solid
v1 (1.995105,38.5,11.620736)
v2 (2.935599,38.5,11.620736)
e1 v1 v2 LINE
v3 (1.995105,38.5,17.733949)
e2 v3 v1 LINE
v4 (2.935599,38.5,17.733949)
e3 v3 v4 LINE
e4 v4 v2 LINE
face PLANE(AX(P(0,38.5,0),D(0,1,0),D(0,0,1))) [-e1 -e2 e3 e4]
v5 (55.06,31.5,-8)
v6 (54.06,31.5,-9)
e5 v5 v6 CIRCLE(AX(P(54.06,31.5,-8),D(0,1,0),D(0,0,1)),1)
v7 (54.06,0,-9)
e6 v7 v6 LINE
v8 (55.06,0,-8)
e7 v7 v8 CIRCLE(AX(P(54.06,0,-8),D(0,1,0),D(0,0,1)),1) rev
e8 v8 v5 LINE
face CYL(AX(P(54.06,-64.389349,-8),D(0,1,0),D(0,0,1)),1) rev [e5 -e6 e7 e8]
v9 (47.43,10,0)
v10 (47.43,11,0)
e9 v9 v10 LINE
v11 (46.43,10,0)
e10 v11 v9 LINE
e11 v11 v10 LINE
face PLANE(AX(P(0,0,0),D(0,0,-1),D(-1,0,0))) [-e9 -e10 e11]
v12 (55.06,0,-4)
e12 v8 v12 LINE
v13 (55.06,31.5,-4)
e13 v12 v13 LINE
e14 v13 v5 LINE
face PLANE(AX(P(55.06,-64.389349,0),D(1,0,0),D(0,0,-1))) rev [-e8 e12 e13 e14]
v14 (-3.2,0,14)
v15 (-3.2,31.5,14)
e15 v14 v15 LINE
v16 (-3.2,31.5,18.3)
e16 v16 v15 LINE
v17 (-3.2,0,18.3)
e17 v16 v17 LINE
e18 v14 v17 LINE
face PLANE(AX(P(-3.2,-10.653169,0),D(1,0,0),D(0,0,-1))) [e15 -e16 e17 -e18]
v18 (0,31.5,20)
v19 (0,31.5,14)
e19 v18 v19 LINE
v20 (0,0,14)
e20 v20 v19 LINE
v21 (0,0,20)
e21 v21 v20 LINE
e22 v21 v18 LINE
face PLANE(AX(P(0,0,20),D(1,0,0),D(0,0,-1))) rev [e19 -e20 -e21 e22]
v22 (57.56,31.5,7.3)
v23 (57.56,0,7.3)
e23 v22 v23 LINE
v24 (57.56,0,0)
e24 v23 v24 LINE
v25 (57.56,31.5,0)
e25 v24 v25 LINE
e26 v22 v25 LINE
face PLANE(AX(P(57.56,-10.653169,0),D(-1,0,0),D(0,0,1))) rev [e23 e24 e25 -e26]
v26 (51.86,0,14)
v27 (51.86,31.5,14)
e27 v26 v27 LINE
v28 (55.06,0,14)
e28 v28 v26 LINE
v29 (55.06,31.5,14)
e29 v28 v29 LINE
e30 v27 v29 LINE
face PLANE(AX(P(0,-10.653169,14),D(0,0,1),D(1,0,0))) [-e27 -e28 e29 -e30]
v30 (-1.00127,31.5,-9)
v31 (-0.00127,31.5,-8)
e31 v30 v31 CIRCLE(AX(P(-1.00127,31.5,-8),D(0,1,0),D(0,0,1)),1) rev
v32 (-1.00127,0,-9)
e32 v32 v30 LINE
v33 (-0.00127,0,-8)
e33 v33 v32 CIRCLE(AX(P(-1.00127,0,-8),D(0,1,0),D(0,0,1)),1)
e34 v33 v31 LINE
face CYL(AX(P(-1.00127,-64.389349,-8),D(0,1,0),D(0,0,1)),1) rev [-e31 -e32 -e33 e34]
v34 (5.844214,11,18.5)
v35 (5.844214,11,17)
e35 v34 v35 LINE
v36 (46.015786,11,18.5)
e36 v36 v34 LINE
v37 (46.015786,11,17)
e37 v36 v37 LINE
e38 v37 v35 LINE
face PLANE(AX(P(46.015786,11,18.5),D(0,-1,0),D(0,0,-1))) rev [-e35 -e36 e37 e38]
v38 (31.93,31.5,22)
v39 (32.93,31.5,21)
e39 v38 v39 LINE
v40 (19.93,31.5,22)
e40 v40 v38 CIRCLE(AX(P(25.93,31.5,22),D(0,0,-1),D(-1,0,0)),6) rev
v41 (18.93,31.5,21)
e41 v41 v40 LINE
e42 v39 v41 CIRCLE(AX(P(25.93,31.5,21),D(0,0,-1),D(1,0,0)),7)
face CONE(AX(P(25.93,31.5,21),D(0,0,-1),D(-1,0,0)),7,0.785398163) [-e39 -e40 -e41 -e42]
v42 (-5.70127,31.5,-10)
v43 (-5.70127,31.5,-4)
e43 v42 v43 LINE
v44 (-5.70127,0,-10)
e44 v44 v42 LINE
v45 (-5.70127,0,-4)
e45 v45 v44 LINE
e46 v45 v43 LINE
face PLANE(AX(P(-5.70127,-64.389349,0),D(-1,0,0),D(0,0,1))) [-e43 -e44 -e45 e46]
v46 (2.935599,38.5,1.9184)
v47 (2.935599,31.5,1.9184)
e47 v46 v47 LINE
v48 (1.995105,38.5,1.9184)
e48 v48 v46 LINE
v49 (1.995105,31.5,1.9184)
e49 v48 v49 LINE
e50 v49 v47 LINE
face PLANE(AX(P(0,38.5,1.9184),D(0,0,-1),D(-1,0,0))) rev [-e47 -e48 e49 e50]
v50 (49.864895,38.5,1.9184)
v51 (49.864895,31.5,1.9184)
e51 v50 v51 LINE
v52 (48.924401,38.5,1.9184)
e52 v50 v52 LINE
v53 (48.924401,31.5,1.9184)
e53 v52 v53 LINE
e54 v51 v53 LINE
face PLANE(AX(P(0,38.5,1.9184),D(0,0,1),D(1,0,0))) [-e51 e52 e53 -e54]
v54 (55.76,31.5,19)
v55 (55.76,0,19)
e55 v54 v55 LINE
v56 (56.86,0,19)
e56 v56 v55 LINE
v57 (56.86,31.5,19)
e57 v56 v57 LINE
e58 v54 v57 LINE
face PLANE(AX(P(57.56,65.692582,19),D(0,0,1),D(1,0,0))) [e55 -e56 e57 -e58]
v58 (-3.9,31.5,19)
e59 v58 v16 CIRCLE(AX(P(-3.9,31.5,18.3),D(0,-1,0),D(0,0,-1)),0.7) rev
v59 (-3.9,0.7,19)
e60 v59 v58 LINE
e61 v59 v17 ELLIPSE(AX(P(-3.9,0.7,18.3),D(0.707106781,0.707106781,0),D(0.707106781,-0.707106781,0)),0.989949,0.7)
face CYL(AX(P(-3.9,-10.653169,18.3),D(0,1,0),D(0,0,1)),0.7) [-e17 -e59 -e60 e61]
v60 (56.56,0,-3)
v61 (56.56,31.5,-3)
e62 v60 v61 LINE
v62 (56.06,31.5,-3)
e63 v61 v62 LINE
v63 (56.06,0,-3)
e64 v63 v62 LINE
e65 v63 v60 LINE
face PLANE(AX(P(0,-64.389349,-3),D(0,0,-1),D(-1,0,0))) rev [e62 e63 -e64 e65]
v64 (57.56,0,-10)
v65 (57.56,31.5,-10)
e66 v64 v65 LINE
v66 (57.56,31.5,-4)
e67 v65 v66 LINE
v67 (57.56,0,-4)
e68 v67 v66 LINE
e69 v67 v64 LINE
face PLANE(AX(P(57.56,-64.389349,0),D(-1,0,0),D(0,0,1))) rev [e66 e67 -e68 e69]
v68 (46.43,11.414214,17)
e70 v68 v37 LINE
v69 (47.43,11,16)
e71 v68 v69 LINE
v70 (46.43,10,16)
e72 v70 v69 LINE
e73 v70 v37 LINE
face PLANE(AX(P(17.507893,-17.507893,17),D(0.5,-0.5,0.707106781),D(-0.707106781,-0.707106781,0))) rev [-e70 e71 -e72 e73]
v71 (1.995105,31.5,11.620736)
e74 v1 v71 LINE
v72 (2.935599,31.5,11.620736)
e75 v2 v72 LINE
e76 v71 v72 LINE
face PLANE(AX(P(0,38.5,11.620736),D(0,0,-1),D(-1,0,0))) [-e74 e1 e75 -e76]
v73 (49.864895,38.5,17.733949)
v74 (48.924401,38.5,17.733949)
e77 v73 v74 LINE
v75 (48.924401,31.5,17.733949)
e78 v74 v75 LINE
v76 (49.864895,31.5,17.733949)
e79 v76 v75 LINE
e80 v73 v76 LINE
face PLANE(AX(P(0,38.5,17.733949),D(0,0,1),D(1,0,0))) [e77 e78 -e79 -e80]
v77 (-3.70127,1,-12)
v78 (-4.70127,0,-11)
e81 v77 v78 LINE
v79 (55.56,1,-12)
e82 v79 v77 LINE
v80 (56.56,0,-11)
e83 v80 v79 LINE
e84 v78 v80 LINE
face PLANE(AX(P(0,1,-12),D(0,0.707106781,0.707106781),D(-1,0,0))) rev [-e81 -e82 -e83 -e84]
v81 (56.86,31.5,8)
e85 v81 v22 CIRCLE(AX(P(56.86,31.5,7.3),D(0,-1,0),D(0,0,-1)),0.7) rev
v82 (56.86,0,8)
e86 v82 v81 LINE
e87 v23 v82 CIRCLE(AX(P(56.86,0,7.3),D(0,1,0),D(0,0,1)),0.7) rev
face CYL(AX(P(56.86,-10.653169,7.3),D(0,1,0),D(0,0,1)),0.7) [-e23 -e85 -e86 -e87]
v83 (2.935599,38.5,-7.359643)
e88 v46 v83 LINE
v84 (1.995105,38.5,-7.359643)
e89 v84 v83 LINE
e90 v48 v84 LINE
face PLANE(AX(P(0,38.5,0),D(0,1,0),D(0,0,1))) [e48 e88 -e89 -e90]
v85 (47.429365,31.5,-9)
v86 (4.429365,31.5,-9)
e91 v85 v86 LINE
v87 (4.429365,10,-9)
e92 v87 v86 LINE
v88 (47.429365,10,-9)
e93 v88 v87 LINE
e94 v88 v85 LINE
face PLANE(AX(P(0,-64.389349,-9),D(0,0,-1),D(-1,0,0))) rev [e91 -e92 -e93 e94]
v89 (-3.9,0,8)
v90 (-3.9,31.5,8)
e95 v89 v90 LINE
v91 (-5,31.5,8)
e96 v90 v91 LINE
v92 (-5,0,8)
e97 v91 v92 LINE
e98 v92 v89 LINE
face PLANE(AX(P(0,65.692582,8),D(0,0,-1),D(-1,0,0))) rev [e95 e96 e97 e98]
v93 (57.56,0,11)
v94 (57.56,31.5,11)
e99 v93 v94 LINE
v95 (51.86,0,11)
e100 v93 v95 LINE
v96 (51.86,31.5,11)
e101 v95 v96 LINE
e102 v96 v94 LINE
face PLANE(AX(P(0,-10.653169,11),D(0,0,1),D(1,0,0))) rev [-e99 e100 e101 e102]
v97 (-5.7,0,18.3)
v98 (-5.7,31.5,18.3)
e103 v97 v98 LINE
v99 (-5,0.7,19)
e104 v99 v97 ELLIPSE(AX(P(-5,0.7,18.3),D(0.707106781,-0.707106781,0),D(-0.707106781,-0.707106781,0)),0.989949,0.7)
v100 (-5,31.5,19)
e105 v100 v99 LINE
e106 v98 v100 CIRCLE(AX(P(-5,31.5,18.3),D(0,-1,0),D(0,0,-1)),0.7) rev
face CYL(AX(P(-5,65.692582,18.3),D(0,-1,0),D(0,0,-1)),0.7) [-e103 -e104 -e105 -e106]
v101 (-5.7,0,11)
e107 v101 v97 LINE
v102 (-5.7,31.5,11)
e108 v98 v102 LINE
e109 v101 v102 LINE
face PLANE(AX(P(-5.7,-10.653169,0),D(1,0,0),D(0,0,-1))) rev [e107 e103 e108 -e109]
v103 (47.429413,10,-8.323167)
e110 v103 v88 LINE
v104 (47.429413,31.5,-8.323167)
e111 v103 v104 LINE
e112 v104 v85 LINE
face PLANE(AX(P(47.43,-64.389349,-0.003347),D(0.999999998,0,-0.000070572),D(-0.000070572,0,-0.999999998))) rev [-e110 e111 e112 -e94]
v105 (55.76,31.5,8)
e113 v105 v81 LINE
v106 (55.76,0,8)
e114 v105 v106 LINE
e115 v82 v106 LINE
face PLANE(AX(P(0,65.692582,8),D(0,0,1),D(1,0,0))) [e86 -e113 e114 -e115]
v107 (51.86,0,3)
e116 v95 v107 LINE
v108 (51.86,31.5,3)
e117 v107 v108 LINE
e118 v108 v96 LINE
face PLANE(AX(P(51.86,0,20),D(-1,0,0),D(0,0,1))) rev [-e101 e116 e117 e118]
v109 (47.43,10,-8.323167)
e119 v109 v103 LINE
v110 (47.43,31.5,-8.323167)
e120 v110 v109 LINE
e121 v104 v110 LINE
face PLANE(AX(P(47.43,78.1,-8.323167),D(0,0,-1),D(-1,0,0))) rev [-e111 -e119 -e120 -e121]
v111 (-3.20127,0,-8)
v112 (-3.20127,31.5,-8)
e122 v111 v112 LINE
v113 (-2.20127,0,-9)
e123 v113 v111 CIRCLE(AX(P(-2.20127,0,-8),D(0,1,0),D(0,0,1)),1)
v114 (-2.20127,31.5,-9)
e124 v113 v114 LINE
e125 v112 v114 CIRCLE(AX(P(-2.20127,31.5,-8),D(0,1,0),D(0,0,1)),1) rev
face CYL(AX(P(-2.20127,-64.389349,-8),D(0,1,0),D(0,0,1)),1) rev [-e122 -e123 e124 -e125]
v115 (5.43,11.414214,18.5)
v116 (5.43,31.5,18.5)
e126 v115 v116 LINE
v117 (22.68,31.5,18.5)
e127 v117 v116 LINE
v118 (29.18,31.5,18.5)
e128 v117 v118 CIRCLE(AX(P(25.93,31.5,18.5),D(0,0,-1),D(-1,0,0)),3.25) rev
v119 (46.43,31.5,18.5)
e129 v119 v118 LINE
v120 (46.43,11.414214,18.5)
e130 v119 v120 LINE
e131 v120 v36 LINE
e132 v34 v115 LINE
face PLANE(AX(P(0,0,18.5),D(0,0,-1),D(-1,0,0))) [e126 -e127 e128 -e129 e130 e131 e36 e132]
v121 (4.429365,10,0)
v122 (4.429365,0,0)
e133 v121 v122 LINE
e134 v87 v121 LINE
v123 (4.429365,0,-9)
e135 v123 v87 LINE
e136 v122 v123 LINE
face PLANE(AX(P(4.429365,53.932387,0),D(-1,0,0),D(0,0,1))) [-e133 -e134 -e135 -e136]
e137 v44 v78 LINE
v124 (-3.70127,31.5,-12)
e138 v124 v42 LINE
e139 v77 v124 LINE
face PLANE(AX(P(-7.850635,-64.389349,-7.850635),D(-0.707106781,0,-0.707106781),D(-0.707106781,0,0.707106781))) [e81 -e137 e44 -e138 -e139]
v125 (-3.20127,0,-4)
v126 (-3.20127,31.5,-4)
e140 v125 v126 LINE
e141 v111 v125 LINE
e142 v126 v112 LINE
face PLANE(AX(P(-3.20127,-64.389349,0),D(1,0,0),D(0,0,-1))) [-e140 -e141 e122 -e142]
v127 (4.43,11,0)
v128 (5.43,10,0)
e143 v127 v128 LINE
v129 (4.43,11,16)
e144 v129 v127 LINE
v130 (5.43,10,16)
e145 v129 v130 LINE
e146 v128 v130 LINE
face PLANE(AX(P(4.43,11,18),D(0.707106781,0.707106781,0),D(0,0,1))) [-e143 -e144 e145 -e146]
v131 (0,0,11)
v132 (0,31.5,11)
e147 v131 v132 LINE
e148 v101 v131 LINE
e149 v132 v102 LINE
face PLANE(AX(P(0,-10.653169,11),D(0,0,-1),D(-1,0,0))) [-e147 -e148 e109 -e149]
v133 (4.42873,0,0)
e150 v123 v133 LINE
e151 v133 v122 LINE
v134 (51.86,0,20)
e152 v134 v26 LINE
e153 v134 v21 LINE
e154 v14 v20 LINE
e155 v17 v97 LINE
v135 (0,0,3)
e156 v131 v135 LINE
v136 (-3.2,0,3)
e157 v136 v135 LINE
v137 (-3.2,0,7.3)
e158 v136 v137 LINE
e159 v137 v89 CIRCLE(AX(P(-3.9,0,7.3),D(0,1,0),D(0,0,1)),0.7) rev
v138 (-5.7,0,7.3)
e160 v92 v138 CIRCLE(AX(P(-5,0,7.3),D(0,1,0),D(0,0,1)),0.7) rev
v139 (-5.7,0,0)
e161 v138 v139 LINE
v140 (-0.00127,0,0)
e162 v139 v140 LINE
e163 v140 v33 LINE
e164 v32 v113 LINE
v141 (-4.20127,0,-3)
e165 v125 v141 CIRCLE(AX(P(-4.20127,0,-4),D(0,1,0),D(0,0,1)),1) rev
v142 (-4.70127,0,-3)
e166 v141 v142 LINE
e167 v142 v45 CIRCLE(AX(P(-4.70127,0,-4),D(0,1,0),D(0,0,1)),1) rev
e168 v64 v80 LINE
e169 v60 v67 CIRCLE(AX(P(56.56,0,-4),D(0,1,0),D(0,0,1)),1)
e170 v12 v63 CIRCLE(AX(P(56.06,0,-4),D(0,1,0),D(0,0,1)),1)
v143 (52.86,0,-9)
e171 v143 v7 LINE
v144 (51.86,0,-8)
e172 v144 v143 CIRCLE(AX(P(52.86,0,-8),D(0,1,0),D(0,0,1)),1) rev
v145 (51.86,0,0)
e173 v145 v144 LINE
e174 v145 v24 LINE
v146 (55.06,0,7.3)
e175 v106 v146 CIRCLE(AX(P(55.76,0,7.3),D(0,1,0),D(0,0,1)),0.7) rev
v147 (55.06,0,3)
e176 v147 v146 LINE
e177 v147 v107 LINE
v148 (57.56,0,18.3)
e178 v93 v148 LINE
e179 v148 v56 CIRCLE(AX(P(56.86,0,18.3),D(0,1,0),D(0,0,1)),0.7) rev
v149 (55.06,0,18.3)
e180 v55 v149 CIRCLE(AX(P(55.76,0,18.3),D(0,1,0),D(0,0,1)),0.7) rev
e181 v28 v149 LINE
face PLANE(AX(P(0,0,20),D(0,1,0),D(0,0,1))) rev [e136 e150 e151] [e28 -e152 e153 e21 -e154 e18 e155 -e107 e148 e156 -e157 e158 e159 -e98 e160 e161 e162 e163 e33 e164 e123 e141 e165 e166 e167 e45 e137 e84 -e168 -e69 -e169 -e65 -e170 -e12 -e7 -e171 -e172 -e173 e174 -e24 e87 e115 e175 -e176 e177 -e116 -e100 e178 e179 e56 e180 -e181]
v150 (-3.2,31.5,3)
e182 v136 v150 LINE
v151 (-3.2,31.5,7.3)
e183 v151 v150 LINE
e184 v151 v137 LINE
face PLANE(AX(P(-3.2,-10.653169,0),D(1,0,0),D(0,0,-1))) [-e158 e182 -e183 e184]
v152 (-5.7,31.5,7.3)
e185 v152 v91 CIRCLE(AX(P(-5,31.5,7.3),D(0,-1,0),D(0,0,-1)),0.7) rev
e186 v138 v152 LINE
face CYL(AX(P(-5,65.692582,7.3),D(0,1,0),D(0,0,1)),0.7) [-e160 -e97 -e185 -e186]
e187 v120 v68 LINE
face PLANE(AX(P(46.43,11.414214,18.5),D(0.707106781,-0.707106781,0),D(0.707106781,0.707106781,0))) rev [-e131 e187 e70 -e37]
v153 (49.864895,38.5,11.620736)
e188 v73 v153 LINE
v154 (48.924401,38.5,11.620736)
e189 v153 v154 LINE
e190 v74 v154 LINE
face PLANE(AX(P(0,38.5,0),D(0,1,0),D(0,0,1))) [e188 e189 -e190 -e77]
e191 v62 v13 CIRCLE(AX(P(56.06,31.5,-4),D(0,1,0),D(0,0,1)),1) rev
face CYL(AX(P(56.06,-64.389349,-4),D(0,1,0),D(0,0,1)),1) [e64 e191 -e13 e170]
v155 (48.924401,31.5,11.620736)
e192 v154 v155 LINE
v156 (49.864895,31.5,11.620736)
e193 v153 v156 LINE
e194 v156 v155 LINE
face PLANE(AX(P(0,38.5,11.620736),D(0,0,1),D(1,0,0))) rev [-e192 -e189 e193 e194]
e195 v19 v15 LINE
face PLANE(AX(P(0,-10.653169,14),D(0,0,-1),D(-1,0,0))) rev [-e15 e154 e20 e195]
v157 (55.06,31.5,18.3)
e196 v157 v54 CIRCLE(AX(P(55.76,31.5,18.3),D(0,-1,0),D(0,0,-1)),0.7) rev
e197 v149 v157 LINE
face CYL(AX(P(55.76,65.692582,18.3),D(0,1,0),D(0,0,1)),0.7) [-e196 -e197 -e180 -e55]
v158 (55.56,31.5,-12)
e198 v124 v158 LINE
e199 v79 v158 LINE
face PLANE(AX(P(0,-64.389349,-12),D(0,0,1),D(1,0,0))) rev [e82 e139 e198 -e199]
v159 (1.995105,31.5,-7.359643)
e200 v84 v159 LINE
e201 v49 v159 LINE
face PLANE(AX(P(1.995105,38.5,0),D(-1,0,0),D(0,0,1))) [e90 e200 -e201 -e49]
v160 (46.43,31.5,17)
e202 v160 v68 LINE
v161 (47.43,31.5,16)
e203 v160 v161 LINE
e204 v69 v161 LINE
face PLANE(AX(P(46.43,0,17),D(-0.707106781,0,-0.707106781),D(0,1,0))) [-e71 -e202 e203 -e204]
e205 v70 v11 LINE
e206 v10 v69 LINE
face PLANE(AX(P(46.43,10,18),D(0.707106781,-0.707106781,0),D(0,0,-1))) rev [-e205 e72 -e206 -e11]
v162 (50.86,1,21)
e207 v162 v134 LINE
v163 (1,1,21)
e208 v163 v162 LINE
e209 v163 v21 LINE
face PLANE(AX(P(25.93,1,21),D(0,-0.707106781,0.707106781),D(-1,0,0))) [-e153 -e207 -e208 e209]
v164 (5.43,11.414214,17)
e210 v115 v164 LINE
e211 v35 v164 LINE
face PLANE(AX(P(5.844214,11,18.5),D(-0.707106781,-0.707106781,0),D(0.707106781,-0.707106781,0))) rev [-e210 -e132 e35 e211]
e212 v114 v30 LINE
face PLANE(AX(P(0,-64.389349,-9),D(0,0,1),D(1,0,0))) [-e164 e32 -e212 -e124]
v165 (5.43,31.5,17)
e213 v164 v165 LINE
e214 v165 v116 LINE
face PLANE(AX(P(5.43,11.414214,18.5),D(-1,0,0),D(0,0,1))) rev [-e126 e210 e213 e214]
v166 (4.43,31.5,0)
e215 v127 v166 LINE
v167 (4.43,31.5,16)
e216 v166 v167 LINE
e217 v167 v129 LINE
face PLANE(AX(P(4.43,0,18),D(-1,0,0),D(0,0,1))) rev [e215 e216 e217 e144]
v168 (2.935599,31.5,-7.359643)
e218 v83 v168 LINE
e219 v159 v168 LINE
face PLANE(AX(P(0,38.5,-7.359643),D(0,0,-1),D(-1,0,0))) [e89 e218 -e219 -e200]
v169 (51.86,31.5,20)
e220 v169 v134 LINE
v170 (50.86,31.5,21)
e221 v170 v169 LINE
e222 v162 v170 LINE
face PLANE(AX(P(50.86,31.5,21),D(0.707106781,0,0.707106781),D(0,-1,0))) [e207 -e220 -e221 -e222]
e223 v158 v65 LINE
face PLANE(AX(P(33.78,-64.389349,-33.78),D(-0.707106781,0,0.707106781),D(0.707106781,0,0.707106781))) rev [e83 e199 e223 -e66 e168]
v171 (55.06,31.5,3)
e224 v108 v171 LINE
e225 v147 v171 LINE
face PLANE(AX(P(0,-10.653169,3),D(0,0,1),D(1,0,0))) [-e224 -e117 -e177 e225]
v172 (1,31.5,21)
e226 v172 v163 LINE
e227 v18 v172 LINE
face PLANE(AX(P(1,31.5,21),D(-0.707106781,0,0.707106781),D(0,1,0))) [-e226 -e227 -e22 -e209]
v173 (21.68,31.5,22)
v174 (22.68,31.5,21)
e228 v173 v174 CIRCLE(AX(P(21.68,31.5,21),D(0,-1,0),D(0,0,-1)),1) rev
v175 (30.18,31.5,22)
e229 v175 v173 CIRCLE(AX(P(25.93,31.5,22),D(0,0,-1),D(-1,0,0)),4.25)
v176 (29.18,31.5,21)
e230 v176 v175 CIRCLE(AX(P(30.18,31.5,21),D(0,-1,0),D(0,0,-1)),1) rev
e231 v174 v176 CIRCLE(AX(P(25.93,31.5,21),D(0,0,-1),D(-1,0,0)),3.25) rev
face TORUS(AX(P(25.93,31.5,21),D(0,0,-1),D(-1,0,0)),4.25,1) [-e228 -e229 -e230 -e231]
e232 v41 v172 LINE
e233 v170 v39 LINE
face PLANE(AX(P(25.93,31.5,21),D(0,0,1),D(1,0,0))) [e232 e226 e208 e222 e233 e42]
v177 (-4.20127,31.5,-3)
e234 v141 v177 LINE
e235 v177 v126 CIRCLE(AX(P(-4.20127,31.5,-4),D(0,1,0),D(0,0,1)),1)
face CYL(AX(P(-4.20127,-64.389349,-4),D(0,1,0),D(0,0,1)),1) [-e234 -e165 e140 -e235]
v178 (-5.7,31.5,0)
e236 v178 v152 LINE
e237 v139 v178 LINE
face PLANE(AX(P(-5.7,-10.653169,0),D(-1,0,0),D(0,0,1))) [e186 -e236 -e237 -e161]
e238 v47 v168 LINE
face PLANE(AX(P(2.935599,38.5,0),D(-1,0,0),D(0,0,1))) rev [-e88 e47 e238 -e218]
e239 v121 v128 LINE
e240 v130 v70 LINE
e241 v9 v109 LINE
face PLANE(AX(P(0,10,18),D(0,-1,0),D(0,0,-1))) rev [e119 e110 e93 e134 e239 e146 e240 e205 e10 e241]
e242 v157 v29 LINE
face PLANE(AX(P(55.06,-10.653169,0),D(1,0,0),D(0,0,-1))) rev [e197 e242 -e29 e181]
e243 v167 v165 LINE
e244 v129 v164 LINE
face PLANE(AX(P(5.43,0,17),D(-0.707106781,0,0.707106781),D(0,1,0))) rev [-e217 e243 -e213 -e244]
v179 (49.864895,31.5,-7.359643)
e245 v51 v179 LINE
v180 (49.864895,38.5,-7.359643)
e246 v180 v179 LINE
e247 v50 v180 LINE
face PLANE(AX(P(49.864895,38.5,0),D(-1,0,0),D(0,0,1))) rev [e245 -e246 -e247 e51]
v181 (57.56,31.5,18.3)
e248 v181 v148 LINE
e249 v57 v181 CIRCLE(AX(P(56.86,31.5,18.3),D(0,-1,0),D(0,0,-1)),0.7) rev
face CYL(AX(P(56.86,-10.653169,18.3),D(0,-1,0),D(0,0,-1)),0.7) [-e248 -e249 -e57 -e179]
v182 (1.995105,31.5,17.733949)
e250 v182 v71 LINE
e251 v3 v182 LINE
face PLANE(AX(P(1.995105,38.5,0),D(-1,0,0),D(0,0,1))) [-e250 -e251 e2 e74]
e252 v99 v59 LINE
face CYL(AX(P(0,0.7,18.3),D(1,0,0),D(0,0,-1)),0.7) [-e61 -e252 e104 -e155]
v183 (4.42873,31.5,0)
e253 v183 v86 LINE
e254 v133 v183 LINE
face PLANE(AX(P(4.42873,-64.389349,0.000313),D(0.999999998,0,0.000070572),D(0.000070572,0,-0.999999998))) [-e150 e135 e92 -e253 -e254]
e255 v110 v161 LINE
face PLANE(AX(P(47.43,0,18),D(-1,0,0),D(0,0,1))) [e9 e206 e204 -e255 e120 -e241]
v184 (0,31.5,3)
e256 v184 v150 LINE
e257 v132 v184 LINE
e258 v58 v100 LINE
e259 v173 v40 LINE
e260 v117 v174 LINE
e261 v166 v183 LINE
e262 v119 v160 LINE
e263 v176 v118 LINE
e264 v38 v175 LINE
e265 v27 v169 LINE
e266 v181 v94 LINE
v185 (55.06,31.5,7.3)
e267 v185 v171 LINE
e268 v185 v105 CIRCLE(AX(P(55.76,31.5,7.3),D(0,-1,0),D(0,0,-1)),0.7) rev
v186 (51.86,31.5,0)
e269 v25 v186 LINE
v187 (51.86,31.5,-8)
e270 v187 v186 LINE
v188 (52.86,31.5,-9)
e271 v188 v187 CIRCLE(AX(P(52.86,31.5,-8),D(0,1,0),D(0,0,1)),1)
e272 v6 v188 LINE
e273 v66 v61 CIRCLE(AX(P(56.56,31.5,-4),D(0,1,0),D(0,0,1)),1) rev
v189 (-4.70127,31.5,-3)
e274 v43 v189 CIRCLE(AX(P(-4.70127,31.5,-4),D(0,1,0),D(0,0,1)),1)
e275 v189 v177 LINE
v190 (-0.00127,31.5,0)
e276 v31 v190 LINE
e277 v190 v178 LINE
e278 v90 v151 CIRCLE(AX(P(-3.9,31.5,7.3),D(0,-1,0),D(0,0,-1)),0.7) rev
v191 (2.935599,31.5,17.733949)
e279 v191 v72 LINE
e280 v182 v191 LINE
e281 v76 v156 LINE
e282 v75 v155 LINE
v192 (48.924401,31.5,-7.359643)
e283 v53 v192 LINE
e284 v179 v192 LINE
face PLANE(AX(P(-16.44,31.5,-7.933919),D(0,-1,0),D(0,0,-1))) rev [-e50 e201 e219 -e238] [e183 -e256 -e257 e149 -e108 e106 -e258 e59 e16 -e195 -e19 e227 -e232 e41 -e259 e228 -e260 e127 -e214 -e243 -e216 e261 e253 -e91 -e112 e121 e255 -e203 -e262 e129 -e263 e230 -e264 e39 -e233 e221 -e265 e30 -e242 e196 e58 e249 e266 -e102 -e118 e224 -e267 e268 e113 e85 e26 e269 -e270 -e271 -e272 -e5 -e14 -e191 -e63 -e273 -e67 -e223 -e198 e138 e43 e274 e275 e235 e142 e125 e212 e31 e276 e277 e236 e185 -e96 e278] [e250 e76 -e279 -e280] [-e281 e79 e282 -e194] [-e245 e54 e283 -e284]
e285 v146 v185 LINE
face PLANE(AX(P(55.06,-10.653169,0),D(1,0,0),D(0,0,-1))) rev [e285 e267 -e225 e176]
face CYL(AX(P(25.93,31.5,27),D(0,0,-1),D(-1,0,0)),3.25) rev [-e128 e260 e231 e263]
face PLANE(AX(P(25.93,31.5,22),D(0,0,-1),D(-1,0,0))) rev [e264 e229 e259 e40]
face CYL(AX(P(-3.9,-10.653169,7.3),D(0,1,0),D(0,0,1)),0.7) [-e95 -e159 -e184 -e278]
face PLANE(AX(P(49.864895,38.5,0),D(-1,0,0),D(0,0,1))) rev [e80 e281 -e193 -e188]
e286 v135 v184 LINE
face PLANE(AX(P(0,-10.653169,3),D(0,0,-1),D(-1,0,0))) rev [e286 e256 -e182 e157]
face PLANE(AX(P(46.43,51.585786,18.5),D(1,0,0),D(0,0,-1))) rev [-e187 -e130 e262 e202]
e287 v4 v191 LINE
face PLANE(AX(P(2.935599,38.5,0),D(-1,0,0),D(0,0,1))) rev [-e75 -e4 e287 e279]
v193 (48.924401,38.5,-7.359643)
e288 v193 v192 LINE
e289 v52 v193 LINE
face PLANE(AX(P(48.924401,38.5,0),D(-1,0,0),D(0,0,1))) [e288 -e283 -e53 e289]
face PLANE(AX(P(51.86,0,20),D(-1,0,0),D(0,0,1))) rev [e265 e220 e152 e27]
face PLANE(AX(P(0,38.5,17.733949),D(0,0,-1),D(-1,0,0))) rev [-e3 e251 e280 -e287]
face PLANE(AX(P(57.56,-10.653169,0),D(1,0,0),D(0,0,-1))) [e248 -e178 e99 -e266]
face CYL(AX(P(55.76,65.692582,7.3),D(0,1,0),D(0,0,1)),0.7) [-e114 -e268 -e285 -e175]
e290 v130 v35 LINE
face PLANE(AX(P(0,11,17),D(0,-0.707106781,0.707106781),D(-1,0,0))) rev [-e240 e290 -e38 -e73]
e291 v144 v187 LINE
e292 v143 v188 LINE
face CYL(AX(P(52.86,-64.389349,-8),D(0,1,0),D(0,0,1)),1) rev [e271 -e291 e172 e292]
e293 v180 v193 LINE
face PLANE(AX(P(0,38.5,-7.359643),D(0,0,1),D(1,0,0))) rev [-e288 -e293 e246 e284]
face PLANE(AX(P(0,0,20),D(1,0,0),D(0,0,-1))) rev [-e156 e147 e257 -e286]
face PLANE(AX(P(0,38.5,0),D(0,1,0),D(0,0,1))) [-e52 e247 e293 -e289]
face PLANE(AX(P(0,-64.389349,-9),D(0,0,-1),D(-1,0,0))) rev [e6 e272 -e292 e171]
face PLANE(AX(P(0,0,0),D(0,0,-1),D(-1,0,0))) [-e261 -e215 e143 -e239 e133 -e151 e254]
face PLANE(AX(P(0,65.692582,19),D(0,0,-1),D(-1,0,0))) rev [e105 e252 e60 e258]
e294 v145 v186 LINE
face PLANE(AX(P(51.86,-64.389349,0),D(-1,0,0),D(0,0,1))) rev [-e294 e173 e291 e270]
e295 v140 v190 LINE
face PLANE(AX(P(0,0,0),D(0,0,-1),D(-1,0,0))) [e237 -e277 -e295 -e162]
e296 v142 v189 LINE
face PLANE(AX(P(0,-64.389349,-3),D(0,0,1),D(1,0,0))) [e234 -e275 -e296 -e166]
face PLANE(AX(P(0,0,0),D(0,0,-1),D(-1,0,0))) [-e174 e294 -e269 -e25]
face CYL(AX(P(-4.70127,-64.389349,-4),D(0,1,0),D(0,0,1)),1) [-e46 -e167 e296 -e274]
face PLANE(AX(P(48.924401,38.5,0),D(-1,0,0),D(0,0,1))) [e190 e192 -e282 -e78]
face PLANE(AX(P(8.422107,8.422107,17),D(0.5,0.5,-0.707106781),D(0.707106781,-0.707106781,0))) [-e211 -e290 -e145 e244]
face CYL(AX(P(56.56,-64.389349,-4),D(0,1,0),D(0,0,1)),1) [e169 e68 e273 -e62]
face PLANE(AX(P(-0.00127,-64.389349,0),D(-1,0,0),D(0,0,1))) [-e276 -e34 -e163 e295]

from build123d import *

# Parameters (mm, degrees)
ESQUISSE1_W              = 51.86
ESQUISSE1_H              = 63
BOSS_EXTRU_1_DEPTH       = 20
ENL_V_MAT_EXTRU_1_DEPTH  = 18
ESQUISSE3_W              = 8.7
ESQUISSE3_H              = 3
BOSS_EXTRU_2_DEPTH       = 7
ESQUISSE4_W              = 43
ESQUISSE4_H              = 43
BOSS_EXTRU_3_DEPTH       = 1
CHANFREIN1_SIZE          = 1
ESQUISSE6_R              = 7
BOSS_EXTRU_4_DEPTH       = 5
ENL_V_MAT_EXTRU_2_DEPTH  = 10
BOSS_EXTRU_5_DEPTH       = 63
ESQUISSE9_W              = 2.5
ESQUISSE9_H              = 1
ENL_V_MAT_EXTRU_3_DEPTH  = 63
CHANFREIN3_SIZE          = 1
CONG_1_R                 = 1
CONG_2_R                 = 1
CONG_5_R                 = 0.7
ENL_V_MAT_EXTRU_11_DEPTH = 1.5
ESQUISSE24_W             = 38.565319184
ESQUISSE24_H             = 34.907409987
ENL_V_MAT_EXTRU_16_DEPTH = 74
BOSS_EXTRU_11_REACH      = 71.206
ESQUISSE26_W             = 43.000682915
ESQUISSE26_H             = 8.323167201
ENL_V_MAT_EXTRU_17_DEPTH = 74
ESQUISSE27_W             = 43.00063515
ESQUISSE27_H             = 9
BOSS_EXTRU_12_DEPTH      = 10
BOSS_EXTRU_13_DEPTH      = 1
CHANFREIN4_SIZE          = 1
CHANFREIN5_SIZE          = 1
ESQUISSE29_W             = 0.940494366
ESQUISSE29_H             = 6.11321338
ESQUISSE29_H_2           = 9.278042655
BOSS_EXTRU_14_DEPTH      = 7


with BuildPart() as part:
    # Esquisse1 → Boss.-Extru.1 (new body)
    with BuildSketch(Plane.XY):
        with Locations((25.93, 31.5)):
            Rectangle(ESQUISSE1_W, ESQUISSE1_H)
    extrude(amount=BOSS_EXTRU_1_DEPTH)

    # Esquisse2 → Enlèv. mat.-Extru.1 (cut)
    with BuildSketch(Plane(origin=(0, 0, 0), x_dir=(-1, 0, 0), z_dir=(0, 0, -1))):
        Polygon((-8.231746032, 10), (-43.628253968, 53), (-47.43, 53), (-47.43, 10), align=None)
        Polygon((-4.43, 53), (-43.628253968, 53), (-8.231746032, 10), (-4.43, 10), align=None)
    extrude(amount=-ENL_V_MAT_EXTRU_1_DEPTH, mode=Mode.SUBTRACT)

    # Esquisse3 → Boss.-Extru.2 (add)
    with BuildSketch(Plane(origin=(0, 0, 0), x_dir=(-1, 0, 0), z_dir=(0, 0, -1))):
        with Locations((-8.88, 57.4)):
            Rectangle(ESQUISSE3_W, ESQUISSE3_H)
        with Locations((-42.98, 57.4)):
            Rectangle(ESQUISSE3_W, ESQUISSE3_H)
        with Locations((-42.98, 5.6)):
            Rectangle(ESQUISSE3_W, ESQUISSE3_H)
        with Locations((-8.88, 5.6)):
            Rectangle(ESQUISSE3_W, ESQUISSE3_H)
    extrude(amount=BOSS_EXTRU_2_DEPTH)

    # Esquisse4 → Boss.-Extru.3 (add)
    with BuildSketch(Plane(origin=(0, 0, 18), x_dir=(-1, 0, 0), z_dir=(0, 0, -1))):
        with Locations((-25.93, 31.5)):
            Rectangle(ESQUISSE4_W, ESQUISSE4_H)
    extrude(amount=BOSS_EXTRU_3_DEPTH)

    # Chanfrein1
    chanfrein1_edges = [part.edges().sort_by_distance(p)[0] for p in [
        (47.43, 10, 8.5),
        (47.43, 53, 8.5),
        (4.43, 10, 8.5),
        (4.43, 53, 8.5),
    ]]
    chamfer(chanfrein1_edges, length=CHANFREIN1_SIZE)

    # Esquisse6 → Boss.-Extru.4 (add)
    with BuildSketch(Plane(origin=(0, 0, 17), x_dir=(-1, 0, 0), z_dir=(0, 0, -1))):
        with Locations((-25.93, 31.5)):
            Circle(ESQUISSE6_R)
    extrude(amount=-BOSS_EXTRU_4_DEPTH)

    # Esquisse7 → Enlèv. mat.-Extru.2 (cut)
    with BuildSketch(Plane(origin=(0, 0, 17), x_dir=(-1, 0, 0), z_dir=(0, 0, -1))):
        with BuildLine():
            ThreePointArc((-22.68, 31.5), (-23.631902961, 33.798097039), (-25.93, 34.75))
            Line((-25.93, 34.75), (-25.93, 28.25))
            ThreePointArc((-25.93, 28.25), (-23.631902961, 29.201902961), (-22.68, 31.5))
        make_face()
        with BuildLine():
            Line((-25.93, 28.25), (-25.93, 34.75))
            ThreePointArc((-25.93, 34.75), (-29.18, 31.5), (-25.93, 28.25))
        make_face()
    extrude(amount=-ENL_V_MAT_EXTRU_2_DEPTH, mode=Mode.SUBTRACT)

    # Esquisse8 → Boss.-Extru.5 (add)
    with BuildSketch(Plane(origin=(0, 63, 0), x_dir=(1, 0, 0), z_dir=(0, 1, 0))):
        Polygon((55.06, -3), (55.06, -9), (57.56, -9), (57.56, 0), (51.86, 0), (51.86, -3), align=None)
        Polygon((57.56, -11), (51.86, -11), (51.86, -14), (55.06, -14), (55.06, -20), (57.56, -20), align=None)
        Polygon((0, -3), (0, 0), (-5.7, 0), (-5.7, -9), (-3.2, -9), (-3.2, -3), align=None)
        Polygon((0, -14), (0, -11), (-5.7, -11), (-5.7, -20), (-3.2, -20), (-3.2, -14), align=None)
    extrude(amount=-BOSS_EXTRU_5_DEPTH)

    # Esquisse9 → Enlèv. mat.-Extru.3 (cut)
    with BuildSketch(Plane.XZ):
        with Locations((-4.45, 8.5)):
            Rectangle(ESQUISSE9_W, ESQUISSE9_H)
        with Locations((-4.45, 19.5)):
            Rectangle(ESQUISSE9_W, ESQUISSE9_H)
        with Locations((56.31, 8.5)):
            Rectangle(ESQUISSE9_W, ESQUISSE9_H)
        with Locations((56.31, 19.5)):
            Rectangle(ESQUISSE9_W, ESQUISSE9_H)
    extrude(amount=-ENL_V_MAT_EXTRU_3_DEPTH, mode=Mode.SUBTRACT)

    # Chanfrein3
    chanfrein3_edges = [part.edges().sort_by_distance(p)[0] for p in [
        (46.93, 52.5, 17),
        (4.93, 52.5, 17),
        (46.93, 10.5, 17),
        (4.93, 10.5, 17),
        (25.93, 34.75, 17),
        (4.43, 31.5, 17),
        (25.93, 10, 17),
        (47.43, 31.5, 17),
        (25.93, 53, 17),
    ]]
    chamfer(chanfrein3_edges, length=CHANFREIN3_SIZE)

    # Congé1
    cong_1_edges = [part.edges().sort_by_distance(p)[0] for p in [
        (4.53, 57.4, -7),
        (8.88, 55.9, -7),
        (8.88, 58.9, -7),
        (13.23, 57.4, -7),
        (38.63, 57.4, -7),
        (42.98, 58.9, -7),
        (47.33, 57.4, -7),
        (42.98, 55.9, -7),
        (47.33, 5.6, -7),
        (42.98, 7.1, -7),
        (42.98, 4.1, -7),
        (38.63, 5.6, -7),
        (13.23, 5.6, -7),
        (8.88, 4.1, -7),
        (4.53, 5.6, -7),
        (8.88, 7.1, -7),
    ]]
    fillet(cong_1_edges, radius=CONG_1_R)

    # Congé2
    cong_2_edges = [part.edges().sort_by_distance(p)[0] for p in [
        (25.93, 34.75, 22),
    ]]
    fillet(cong_2_edges, radius=CONG_2_R)

    # Congé5
    cong_5_edges = [part.edges().sort_by_distance(p)[0] for p in [
        (-3.2, 31.5, 19),
        (-5.7, 31.5, 19),
        (-3.2, 31.5, 8),
        (-5.7, 31.5, 8),
        (55.06, 31.5, 8),
        (57.56, 31.5, 8),
        (55.06, 31.5, 19),
        (57.56, 31.5, 19),
        (-4.45, 0, 19),
        (-4.45, 63, 19),
    ]]
    fillet(cong_5_edges, radius=CONG_5_R)

    # Esquisse19 → Enlèv. mat.-Extru.11 (cut)
    with BuildSketch(Plane(origin=(0, 0, 17), x_dir=(-1, 0, 0), z_dir=(0, 0, -1))):
        Polygon((-46.43, 11.414213562), (-46.015786438, 11), (-5.844213562, 11), (-5.43, 11.414213562), (-5.43, 51.585786438), (-5.844213562, 52), (-46.015786438, 52), (-46.43, 51.585786438), align=None)
    extrude(amount=-ENL_V_MAT_EXTRU_11_DEPTH, mode=Mode.SUBTRACT)

    # Esquisse24 → Enlèv. mat.-Extru.16 (cut)
    with BuildSketch(Plane(origin=(57.56, 0, 0), x_dir=(0, 0, -1), z_dir=(1, 0, 0))):
        with Locations((-11.348740569, 48.953704994)):
            Rectangle(ESQUISSE24_W, ESQUISSE24_H)
    extrude(amount=-ENL_V_MAT_EXTRU_16_DEPTH, mode=Mode.SUBTRACT)

    # Boss.-Extru.11: up to this face of the body (flat: up to its plane)
    boss_extru_11_end = Plane(part.part.faces().sort_by_distance((25.97056106, 0, 9.851467598))[0])
    # Esquisse25 → Boss.-Extru.11 (add, up to the picked face)
    with BuildSketch(Plane(origin=(0, 31.5, 0), x_dir=(1, 0, 0), z_dir=(0, 1, 0)), mode=Mode.PRIVATE) as boss_extru_11_sk1:
        with BuildLine():
            Line((47.42936485, 9), (47.43, 0))
            Line((47.43, 0), (51.86, 0))
            Line((51.86, 0), (51.86, 8))
            ThreePointArc((51.86, 8), (52.152893219, 8.707106781), (52.86, 9))
            Line((52.86, 9), (54.06, 9))
            ThreePointArc((54.06, 9), (54.767106781, 8.707106781), (55.06, 8))
            Line((55.06, 8), (55.06, 4))
            ThreePointArc((55.06, 4), (55.352893219, 3.292893219), (56.06, 3))
            Line((56.06, 3), (56.56, 3))
            ThreePointArc((56.56, 3), (57.267106781, 3.292893219), (57.56, 4))
            Line((57.56, 4), (57.56, 10))
            Line((57.56, 10), (55.56, 12))
            Line((55.56, 12), (25.92936485, 12))
            Line((25.92936485, 12), (25.92936485, 9))
            Line((25.92936485, 9), (47.42936485, 9))
        make_face()
    boss_extru_11_tool1 = split(extrude(boss_extru_11_sk1.sketch, amount=-BOSS_EXTRU_11_REACH, mode=Mode.PRIVATE), bisect_by=boss_extru_11_end, keep=Keep.BOTH, mode=Mode.PRIVATE)
    # Esquisse25 → Boss.-Extru.11 (add, up to the picked face)
    with BuildSketch(Plane(origin=(0, 31.5, 0), x_dir=(1, 0, 0), z_dir=(0, 1, 0)), mode=Mode.PRIVATE) as boss_extru_11_sk2:
        with BuildLine():
            Line((4.42936485, 9), (25.92936485, 9))
            Line((25.92936485, 9), (25.92936485, 12))
            Line((25.92936485, 12), (-3.7012703, 12))
            Line((-3.7012703, 12), (-5.7012703, 10))
            Line((-5.7012703, 10), (-5.7012703, 4))
            ThreePointArc((-5.7012703, 4), (-5.408377081, 3.292893219), (-4.7012703, 3))
            Line((-4.7012703, 3), (-4.2012703, 3))
            ThreePointArc((-4.2012703, 3), (-3.494163519, 3.292893219), (-3.2012703, 4))
            Line((-3.2012703, 4), (-3.2012703, 8))
            ThreePointArc((-3.2012703, 8), (-2.908377081, 8.707106781), (-2.2012703, 9))
            Line((-2.2012703, 9), (-1.0012703, 9))
            ThreePointArc((-1.0012703, 9), (-0.294163519, 8.707106781), (-0.0012703, 8))
            Line((-0.0012703, 8), (-0.0012703, 0))
            Line((-0.0012703, 0), (4.4287297, 0))
            Line((4.4287297, 0), (4.42936485, 9))
        make_face()
    boss_extru_11_tool2 = split(extrude(boss_extru_11_sk2.sketch, amount=-BOSS_EXTRU_11_REACH, mode=Mode.PRIVATE), bisect_by=boss_extru_11_end, keep=Keep.BOTH, mode=Mode.PRIVATE)
    add(boss_extru_11_tool1.solids().sort_by(Axis((36.679365, 31.5, -9.338304), (0, -1, 0)))[0])
    add(boss_extru_11_tool2.solids().sort_by(Axis((15.179365, 31.5, -9.338304), (0, -1, 0)))[0])

    # Esquisse26 → Enlèv. mat.-Extru.17 (cut)
    with BuildSketch(Plane.XZ.offset(-4.1)):
        with Locations((25.929658543, -4.161583601)):
            Rectangle(ESQUISSE26_W, ESQUISSE26_H)
    extrude(amount=-ENL_V_MAT_EXTRU_17_DEPTH, mode=Mode.SUBTRACT)

    # Esquisse27 → Boss.-Extru.12 (add)
    with BuildSketch(Plane.XZ):
        with Locations((25.929682425, -4.5)):
            Rectangle(ESQUISSE27_W, ESQUISSE27_H)
    extrude(amount=-BOSS_EXTRU_12_DEPTH)

    # Esquisse28 → Boss.-Extru.13 (add)
    with BuildSketch(Plane.XY.offset(20)):
        with BuildLine():
            Line((51.86, 0), (51.86, 31.5))
            Line((51.86, 31.5), (32.93, 31.5))
            ThreePointArc((32.93, 31.5), (25.93, 24.5), (18.93, 31.5))
            Line((18.93, 31.5), (0, 31.5))
            Line((0, 31.5), (0, 0))
            Line((0, 0), (51.86, 0))
        make_face()
    extrude(amount=BOSS_EXTRU_13_DEPTH)

    # Chanfrein4
    chanfrein4_edges = [part.edges().sort_by_distance(p)[0] for p in [
        (25.93, 24.5, 22),
    ]]
    chamfer(chanfrein4_edges, length=CHANFREIN4_SIZE - 0.0001)  # a hair under: the kernel refuses the full size

    # Chanfrein5
    chanfrein5_edges = [part.edges().sort_by_distance(p)[0] for p in [
        (25.92936485, 0, -12),
        (25.93, 0, 21),
        (51.86, 15.75, 21),
        (0, 15.75, 21),
    ]]
    chamfer(chanfrein5_edges, length=CHANFREIN5_SIZE)

    # Esquisse29 → Boss.-Extru.14 (add)
    with BuildSketch(Plane(origin=(0, 31.5, 0), x_dir=(1, 0, 0), z_dir=(0, 1, 0))):
        with Locations((2.465352228, -14.677342748)):
            Rectangle(ESQUISSE29_W, ESQUISSE29_H)
        with Locations((2.465352228, 2.720621555)):
            Rectangle(ESQUISSE29_W, ESQUISSE29_H_2)
        with Locations((49.394647772, 2.720621555)):
            Rectangle(ESQUISSE29_W, ESQUISSE29_H_2)
        with Locations((49.394647772, -14.677342748)):
            Rectangle(ESQUISSE29_W, ESQUISSE29_H)
    extrude(amount=BOSS_EXTRU_14_DEPTH)


solid = part.part
